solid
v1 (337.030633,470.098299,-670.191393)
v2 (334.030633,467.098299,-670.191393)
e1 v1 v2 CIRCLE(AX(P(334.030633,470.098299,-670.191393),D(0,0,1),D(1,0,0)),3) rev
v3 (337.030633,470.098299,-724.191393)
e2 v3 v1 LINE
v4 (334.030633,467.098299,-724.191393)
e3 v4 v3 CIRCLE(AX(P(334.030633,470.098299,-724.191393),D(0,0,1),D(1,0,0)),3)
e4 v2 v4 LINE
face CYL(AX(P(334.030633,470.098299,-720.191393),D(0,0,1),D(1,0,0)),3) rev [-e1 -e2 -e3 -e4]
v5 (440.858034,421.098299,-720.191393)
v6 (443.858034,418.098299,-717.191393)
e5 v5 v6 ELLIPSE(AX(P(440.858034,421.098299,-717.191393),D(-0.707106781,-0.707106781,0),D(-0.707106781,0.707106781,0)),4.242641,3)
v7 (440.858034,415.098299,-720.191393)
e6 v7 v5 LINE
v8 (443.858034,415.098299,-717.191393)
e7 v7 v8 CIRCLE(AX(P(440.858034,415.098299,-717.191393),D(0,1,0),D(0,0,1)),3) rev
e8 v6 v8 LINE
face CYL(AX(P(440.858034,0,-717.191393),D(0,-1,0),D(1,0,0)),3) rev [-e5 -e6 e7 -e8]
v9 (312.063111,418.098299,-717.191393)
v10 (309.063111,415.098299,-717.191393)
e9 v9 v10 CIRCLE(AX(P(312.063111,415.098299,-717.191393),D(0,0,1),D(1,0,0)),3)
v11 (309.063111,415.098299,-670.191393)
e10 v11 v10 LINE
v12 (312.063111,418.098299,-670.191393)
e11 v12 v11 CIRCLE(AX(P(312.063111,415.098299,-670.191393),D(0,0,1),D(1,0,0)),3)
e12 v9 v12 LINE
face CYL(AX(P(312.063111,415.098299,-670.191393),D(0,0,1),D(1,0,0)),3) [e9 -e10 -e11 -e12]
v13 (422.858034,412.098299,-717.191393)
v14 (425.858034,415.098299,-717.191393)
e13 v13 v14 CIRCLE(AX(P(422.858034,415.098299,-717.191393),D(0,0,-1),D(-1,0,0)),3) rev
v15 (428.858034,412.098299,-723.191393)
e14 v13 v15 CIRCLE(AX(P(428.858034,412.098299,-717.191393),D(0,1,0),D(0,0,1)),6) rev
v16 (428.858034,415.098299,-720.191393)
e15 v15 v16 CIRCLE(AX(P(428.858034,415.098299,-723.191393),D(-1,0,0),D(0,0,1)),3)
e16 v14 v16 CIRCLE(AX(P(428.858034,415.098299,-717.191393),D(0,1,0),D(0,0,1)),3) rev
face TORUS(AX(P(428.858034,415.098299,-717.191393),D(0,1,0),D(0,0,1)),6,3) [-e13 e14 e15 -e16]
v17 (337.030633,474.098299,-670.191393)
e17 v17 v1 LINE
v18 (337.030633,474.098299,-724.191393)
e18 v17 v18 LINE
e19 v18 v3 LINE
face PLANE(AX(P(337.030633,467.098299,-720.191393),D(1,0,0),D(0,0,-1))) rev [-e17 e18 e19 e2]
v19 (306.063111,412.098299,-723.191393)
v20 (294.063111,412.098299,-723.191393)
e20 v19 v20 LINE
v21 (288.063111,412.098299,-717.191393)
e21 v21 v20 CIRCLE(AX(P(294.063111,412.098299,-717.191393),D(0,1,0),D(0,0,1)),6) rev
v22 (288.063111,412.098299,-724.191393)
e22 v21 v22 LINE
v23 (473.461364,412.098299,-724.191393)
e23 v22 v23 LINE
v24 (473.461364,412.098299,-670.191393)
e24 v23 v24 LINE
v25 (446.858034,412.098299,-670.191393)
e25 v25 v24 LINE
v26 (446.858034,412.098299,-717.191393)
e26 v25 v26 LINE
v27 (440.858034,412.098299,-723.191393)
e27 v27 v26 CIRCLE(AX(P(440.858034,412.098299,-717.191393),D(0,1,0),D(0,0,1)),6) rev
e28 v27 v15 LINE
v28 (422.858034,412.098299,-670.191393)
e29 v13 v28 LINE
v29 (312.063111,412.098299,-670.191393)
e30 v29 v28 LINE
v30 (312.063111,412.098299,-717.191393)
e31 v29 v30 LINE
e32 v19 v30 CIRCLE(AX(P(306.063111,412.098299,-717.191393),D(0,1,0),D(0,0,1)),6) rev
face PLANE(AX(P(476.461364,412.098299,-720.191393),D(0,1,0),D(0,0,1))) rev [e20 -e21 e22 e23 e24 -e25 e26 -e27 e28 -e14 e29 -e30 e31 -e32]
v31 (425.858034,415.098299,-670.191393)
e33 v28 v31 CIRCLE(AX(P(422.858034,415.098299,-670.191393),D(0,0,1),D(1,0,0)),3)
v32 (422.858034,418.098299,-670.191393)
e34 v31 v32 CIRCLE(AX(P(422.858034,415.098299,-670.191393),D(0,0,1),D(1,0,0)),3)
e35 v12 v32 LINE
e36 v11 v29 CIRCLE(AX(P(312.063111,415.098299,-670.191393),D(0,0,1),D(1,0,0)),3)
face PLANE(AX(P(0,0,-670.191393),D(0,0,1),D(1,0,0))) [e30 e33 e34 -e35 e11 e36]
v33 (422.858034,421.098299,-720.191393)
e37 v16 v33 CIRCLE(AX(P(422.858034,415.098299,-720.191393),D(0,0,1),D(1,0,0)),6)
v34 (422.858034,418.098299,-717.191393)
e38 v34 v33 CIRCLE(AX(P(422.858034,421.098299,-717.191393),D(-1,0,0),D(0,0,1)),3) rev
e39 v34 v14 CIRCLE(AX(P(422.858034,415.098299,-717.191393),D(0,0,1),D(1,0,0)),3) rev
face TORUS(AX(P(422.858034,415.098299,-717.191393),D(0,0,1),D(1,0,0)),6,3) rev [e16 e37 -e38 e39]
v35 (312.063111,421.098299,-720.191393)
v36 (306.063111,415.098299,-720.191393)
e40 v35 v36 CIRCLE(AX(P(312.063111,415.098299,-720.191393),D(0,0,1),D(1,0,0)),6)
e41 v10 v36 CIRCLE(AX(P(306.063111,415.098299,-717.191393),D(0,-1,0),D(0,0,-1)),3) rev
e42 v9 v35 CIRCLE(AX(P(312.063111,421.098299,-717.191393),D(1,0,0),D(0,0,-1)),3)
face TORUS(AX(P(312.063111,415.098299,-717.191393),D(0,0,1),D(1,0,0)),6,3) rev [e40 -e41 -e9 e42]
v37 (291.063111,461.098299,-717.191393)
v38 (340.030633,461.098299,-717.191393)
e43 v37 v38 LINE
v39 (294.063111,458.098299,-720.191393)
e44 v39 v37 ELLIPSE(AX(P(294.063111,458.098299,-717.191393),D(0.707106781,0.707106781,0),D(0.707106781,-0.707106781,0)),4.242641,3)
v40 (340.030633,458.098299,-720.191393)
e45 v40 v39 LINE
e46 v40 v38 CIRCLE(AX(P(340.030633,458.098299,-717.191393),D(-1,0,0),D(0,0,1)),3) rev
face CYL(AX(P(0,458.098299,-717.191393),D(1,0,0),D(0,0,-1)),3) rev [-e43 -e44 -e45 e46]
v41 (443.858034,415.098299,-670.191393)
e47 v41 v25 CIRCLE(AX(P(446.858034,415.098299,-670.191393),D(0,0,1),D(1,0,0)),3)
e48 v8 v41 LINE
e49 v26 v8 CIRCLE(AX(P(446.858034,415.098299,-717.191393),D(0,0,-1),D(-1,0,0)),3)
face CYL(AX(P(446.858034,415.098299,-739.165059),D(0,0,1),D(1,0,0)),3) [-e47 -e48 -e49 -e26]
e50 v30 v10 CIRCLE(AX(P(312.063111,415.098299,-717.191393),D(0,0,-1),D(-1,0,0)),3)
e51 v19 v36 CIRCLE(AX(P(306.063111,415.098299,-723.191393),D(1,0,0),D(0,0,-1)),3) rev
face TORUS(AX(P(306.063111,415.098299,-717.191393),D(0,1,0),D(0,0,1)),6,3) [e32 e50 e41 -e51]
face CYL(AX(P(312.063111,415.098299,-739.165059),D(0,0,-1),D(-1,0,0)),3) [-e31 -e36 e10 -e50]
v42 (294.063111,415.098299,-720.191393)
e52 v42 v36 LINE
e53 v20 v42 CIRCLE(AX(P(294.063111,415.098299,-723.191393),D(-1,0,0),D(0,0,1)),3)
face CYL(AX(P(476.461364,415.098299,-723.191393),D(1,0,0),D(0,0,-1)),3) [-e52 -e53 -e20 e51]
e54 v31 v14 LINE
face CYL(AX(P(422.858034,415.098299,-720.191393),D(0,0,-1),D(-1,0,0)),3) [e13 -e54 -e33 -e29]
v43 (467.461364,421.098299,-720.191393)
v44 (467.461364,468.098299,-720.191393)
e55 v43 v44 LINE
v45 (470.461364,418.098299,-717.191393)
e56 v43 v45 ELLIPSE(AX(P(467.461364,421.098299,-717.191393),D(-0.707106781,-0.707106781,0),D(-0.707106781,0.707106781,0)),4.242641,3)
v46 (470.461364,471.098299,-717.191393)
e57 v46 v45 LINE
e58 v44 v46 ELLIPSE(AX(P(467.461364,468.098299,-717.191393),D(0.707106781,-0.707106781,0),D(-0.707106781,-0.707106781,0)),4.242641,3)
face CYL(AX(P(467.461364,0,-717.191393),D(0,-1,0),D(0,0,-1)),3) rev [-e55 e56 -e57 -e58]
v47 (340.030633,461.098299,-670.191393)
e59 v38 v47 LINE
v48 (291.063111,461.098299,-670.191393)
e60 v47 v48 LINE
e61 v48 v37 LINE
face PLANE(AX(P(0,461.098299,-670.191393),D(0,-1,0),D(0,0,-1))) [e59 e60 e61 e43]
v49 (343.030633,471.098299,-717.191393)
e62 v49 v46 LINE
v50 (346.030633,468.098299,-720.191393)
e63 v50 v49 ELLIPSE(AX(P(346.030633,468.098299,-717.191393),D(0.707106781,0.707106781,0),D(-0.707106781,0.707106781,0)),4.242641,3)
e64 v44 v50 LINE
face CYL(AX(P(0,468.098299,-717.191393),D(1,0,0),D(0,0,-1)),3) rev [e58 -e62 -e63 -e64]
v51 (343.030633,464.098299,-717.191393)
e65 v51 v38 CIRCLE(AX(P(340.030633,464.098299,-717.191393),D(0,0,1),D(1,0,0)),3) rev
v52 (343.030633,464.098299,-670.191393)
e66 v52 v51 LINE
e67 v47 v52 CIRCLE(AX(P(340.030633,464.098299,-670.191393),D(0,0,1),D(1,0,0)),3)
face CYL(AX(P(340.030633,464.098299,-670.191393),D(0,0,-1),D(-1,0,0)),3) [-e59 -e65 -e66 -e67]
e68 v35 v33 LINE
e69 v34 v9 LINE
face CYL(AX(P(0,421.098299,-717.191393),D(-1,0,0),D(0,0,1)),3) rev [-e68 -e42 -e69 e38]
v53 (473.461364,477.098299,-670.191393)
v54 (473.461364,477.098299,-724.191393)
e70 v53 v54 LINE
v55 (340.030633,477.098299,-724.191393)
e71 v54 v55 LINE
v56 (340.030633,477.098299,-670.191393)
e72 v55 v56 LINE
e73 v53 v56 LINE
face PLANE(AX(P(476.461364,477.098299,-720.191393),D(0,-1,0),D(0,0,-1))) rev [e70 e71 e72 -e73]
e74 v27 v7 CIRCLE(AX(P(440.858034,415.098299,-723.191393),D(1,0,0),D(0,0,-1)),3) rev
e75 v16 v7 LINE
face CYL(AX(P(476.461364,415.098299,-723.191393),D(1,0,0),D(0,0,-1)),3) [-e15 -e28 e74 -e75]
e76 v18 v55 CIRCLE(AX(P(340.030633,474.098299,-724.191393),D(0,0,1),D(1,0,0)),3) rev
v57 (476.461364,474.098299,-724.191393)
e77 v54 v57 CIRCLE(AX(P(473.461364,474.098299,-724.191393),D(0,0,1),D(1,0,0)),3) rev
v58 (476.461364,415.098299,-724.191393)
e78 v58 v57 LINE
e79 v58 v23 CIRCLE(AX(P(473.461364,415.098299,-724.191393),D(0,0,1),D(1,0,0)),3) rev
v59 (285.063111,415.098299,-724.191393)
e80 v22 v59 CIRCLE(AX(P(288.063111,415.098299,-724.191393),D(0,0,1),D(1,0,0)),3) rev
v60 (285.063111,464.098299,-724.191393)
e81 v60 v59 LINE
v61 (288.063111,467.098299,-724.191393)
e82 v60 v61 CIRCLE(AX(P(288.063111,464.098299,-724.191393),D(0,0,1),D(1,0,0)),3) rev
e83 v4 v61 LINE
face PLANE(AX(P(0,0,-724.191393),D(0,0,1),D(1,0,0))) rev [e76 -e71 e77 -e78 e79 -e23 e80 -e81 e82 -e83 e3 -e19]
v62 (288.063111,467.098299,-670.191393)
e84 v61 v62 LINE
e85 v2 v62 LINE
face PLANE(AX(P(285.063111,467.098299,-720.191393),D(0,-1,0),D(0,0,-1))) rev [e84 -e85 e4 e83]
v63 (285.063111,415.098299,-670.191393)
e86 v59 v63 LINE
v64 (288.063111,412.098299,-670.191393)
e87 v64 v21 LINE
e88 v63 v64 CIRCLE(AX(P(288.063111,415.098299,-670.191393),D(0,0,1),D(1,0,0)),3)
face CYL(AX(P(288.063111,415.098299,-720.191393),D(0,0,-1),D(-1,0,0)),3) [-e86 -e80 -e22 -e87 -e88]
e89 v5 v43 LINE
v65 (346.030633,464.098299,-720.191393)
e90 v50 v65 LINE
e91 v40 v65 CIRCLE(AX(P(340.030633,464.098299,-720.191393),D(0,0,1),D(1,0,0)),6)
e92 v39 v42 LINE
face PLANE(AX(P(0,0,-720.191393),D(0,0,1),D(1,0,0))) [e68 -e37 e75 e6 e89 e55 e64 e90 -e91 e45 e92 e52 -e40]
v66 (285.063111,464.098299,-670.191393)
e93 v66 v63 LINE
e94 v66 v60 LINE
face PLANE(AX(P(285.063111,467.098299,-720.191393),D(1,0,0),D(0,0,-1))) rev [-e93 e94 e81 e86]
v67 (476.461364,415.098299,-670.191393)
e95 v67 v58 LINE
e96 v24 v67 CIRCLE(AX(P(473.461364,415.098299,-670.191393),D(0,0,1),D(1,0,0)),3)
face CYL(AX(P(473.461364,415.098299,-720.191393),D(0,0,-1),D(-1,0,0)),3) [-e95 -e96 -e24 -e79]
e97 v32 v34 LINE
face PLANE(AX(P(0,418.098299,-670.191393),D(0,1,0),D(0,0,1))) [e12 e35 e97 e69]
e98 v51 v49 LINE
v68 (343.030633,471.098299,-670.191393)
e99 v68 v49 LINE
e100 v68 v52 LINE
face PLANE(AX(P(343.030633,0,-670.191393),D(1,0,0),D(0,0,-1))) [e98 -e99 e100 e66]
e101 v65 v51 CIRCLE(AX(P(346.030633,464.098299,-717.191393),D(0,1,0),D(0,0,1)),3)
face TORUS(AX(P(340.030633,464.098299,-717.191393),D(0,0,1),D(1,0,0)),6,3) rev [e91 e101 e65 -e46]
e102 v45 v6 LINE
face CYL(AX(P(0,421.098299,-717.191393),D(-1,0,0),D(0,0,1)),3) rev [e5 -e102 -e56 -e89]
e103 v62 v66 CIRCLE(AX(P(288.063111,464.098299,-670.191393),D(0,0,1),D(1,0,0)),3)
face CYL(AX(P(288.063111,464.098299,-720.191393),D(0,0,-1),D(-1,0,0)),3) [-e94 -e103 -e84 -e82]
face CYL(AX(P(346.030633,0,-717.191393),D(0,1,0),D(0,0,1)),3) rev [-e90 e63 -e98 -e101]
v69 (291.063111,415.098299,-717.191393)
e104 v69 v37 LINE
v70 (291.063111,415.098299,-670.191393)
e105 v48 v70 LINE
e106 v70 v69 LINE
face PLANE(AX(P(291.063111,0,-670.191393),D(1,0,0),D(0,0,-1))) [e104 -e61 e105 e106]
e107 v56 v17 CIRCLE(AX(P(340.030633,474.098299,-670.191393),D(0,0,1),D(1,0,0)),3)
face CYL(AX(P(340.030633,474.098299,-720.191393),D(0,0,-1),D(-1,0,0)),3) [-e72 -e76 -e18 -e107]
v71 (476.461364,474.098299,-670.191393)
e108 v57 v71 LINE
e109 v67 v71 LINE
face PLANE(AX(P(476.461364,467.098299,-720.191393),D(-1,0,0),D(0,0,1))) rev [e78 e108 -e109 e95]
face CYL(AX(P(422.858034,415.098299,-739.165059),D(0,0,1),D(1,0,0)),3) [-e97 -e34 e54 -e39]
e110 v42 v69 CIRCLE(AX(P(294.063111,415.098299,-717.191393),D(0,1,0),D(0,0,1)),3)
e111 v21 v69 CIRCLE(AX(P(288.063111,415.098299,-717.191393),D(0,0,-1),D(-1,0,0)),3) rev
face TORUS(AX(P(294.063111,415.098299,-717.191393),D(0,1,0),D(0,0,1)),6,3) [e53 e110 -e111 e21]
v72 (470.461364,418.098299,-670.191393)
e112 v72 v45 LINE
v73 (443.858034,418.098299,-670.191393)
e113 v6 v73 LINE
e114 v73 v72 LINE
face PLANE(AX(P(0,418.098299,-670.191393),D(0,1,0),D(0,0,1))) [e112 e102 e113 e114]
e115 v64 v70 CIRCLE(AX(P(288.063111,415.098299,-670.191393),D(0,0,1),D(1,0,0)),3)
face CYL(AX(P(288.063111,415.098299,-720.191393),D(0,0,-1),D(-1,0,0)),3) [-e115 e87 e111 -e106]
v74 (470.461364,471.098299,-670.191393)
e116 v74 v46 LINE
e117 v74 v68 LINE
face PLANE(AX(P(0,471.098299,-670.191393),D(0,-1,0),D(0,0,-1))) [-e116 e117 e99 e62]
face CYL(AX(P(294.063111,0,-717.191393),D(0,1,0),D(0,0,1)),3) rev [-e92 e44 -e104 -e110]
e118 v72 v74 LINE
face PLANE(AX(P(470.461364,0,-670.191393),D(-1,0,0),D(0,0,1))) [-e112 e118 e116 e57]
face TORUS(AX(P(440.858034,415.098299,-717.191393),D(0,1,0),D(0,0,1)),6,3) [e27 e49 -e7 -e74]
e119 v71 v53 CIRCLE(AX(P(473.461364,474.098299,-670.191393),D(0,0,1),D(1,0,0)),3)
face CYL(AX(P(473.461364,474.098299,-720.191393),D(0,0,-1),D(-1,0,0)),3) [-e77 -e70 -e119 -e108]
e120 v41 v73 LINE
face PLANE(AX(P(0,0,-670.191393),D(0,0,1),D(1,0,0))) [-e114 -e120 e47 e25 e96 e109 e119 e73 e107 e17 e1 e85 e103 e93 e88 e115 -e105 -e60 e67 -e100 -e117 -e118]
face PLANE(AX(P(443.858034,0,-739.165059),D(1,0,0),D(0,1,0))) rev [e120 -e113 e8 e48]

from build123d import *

# Parameters (mm, degrees)
BOSS_EXTRUDE1_DEPTH     = 4
BOSS_EXTRUDE2_DEPTH     = 50
CUT_EXTRUDE1_DEPTH      = 677.427541211
CUT_EXTRUDE1_DEPTH_BACK = 50
SKETCH3_W               = 18
SKETCH3_H               = 6
FILLET3_R               = 3


with BuildPart() as part:
    # Sketch1 → Boss-Extrude1 (new body)
    with BuildSketch(Plane.XY.offset(-724.191392871)):
        Polygon((476.461364297, 467.098298929), (476.461364297, 412.098298929), (285.063110998, 412.098298929), (285.063110998, 467.098298929), (337.030633325, 467.098298929), (337.030633325, 477.098298929), (476.461364297, 477.098298929), align=None)
    extrude(amount=BOSS_EXTRUDE1_DEPTH)

    # Sketch2 → Boss-Extrude2 (add)
    with BuildSketch(Plane.XY.offset(-720.191392871)):
        Polygon((285.063110998, 467.098298929), (285.063110998, 412.098298929), (476.461364297, 412.098298929), (476.461364297, 477.098298929), (337.030633325, 477.098298929), (337.030633325, 467.098298929), align=None)
        Polygon((291.063110998, 461.098298929), (343.030633325, 461.098298929), (343.030633325, 471.098298929), (470.461364297, 471.098298929), (470.461364297, 418.098298929), (291.063110998, 418.098298929), align=None, mode=Mode.SUBTRACT)
    extrude(amount=BOSS_EXTRUDE2_DEPTH)

    # Sketch3 → Cut-Extrude1 (cut, two sides: drawn at the far end of the back side and taken through both)
    with BuildSketch(Plane.XY.offset(-670.191392871).offset(-CUT_EXTRUDE1_DEPTH_BACK)):
        with Locations((300.063110998, 415.098298929)):
            Rectangle(SKETCH3_W, SKETCH3_H)
        with Locations((434.858034082, 415.098298929)):
            Rectangle(SKETCH3_W, SKETCH3_H)
    extrude(amount=CUT_EXTRUDE1_DEPTH + CUT_EXTRUDE1_DEPTH_BACK, mode=Mode.SUBTRACT)

    # Fillet3
    fillet3_edges = [part.edges().sort_by_distance(p)[0] for p in [
        (337.030633325, 477.098298929, -697.191392871),
        (476.461364297, 477.098298929, -697.191392871),
        (476.461364297, 412.098298929, -697.191392871),
        (285.063110998, 412.098298929, -697.191392871),
        (285.063110998, 467.098298929, -697.191392871),
        (337.030633325, 467.098298929, -697.191392871),
        (343.030633325, 461.098298929, -695.191392871),
        (406.745998811, 471.098298929, -720.191392871),
        (343.030633325, 466.098298929, -720.191392871),
        (317.046872162, 461.098298929, -720.191392871),
        (291.063110998, 436.598298929, -720.191392871),
        (470.461364297, 444.598298929, -720.191392871),
        (367.46057254, 418.098298929, -720.191392871),
        (457.159699189, 418.098298929, -720.191392871),
        (309.063110998, 418.098298929, -695.191392871),
        (309.063110998, 415.098298929, -720.191392871),
        (309.063110998, 412.098298929, -695.191392871),
        (291.063110998, 412.098298929, -695.191392871),
        (300.063110998, 412.098298929, -720.191392871),
        (425.858034082, 412.098298929, -695.191392871),
        (425.858034082, 415.098298929, -720.191392871),
        (425.858034082, 418.098298929, -695.191392871),
        (443.858034082, 412.098298929, -695.191392871),
        (443.858034082, 415.098298929, -720.191392871),
        (434.858034082, 412.098298929, -720.191392871),
    ]]
    fillet(fillet3_edges, radius=FILLET3_R - 0.0001)  # a hair under: the kernel refuses the full size


solid = part.part
